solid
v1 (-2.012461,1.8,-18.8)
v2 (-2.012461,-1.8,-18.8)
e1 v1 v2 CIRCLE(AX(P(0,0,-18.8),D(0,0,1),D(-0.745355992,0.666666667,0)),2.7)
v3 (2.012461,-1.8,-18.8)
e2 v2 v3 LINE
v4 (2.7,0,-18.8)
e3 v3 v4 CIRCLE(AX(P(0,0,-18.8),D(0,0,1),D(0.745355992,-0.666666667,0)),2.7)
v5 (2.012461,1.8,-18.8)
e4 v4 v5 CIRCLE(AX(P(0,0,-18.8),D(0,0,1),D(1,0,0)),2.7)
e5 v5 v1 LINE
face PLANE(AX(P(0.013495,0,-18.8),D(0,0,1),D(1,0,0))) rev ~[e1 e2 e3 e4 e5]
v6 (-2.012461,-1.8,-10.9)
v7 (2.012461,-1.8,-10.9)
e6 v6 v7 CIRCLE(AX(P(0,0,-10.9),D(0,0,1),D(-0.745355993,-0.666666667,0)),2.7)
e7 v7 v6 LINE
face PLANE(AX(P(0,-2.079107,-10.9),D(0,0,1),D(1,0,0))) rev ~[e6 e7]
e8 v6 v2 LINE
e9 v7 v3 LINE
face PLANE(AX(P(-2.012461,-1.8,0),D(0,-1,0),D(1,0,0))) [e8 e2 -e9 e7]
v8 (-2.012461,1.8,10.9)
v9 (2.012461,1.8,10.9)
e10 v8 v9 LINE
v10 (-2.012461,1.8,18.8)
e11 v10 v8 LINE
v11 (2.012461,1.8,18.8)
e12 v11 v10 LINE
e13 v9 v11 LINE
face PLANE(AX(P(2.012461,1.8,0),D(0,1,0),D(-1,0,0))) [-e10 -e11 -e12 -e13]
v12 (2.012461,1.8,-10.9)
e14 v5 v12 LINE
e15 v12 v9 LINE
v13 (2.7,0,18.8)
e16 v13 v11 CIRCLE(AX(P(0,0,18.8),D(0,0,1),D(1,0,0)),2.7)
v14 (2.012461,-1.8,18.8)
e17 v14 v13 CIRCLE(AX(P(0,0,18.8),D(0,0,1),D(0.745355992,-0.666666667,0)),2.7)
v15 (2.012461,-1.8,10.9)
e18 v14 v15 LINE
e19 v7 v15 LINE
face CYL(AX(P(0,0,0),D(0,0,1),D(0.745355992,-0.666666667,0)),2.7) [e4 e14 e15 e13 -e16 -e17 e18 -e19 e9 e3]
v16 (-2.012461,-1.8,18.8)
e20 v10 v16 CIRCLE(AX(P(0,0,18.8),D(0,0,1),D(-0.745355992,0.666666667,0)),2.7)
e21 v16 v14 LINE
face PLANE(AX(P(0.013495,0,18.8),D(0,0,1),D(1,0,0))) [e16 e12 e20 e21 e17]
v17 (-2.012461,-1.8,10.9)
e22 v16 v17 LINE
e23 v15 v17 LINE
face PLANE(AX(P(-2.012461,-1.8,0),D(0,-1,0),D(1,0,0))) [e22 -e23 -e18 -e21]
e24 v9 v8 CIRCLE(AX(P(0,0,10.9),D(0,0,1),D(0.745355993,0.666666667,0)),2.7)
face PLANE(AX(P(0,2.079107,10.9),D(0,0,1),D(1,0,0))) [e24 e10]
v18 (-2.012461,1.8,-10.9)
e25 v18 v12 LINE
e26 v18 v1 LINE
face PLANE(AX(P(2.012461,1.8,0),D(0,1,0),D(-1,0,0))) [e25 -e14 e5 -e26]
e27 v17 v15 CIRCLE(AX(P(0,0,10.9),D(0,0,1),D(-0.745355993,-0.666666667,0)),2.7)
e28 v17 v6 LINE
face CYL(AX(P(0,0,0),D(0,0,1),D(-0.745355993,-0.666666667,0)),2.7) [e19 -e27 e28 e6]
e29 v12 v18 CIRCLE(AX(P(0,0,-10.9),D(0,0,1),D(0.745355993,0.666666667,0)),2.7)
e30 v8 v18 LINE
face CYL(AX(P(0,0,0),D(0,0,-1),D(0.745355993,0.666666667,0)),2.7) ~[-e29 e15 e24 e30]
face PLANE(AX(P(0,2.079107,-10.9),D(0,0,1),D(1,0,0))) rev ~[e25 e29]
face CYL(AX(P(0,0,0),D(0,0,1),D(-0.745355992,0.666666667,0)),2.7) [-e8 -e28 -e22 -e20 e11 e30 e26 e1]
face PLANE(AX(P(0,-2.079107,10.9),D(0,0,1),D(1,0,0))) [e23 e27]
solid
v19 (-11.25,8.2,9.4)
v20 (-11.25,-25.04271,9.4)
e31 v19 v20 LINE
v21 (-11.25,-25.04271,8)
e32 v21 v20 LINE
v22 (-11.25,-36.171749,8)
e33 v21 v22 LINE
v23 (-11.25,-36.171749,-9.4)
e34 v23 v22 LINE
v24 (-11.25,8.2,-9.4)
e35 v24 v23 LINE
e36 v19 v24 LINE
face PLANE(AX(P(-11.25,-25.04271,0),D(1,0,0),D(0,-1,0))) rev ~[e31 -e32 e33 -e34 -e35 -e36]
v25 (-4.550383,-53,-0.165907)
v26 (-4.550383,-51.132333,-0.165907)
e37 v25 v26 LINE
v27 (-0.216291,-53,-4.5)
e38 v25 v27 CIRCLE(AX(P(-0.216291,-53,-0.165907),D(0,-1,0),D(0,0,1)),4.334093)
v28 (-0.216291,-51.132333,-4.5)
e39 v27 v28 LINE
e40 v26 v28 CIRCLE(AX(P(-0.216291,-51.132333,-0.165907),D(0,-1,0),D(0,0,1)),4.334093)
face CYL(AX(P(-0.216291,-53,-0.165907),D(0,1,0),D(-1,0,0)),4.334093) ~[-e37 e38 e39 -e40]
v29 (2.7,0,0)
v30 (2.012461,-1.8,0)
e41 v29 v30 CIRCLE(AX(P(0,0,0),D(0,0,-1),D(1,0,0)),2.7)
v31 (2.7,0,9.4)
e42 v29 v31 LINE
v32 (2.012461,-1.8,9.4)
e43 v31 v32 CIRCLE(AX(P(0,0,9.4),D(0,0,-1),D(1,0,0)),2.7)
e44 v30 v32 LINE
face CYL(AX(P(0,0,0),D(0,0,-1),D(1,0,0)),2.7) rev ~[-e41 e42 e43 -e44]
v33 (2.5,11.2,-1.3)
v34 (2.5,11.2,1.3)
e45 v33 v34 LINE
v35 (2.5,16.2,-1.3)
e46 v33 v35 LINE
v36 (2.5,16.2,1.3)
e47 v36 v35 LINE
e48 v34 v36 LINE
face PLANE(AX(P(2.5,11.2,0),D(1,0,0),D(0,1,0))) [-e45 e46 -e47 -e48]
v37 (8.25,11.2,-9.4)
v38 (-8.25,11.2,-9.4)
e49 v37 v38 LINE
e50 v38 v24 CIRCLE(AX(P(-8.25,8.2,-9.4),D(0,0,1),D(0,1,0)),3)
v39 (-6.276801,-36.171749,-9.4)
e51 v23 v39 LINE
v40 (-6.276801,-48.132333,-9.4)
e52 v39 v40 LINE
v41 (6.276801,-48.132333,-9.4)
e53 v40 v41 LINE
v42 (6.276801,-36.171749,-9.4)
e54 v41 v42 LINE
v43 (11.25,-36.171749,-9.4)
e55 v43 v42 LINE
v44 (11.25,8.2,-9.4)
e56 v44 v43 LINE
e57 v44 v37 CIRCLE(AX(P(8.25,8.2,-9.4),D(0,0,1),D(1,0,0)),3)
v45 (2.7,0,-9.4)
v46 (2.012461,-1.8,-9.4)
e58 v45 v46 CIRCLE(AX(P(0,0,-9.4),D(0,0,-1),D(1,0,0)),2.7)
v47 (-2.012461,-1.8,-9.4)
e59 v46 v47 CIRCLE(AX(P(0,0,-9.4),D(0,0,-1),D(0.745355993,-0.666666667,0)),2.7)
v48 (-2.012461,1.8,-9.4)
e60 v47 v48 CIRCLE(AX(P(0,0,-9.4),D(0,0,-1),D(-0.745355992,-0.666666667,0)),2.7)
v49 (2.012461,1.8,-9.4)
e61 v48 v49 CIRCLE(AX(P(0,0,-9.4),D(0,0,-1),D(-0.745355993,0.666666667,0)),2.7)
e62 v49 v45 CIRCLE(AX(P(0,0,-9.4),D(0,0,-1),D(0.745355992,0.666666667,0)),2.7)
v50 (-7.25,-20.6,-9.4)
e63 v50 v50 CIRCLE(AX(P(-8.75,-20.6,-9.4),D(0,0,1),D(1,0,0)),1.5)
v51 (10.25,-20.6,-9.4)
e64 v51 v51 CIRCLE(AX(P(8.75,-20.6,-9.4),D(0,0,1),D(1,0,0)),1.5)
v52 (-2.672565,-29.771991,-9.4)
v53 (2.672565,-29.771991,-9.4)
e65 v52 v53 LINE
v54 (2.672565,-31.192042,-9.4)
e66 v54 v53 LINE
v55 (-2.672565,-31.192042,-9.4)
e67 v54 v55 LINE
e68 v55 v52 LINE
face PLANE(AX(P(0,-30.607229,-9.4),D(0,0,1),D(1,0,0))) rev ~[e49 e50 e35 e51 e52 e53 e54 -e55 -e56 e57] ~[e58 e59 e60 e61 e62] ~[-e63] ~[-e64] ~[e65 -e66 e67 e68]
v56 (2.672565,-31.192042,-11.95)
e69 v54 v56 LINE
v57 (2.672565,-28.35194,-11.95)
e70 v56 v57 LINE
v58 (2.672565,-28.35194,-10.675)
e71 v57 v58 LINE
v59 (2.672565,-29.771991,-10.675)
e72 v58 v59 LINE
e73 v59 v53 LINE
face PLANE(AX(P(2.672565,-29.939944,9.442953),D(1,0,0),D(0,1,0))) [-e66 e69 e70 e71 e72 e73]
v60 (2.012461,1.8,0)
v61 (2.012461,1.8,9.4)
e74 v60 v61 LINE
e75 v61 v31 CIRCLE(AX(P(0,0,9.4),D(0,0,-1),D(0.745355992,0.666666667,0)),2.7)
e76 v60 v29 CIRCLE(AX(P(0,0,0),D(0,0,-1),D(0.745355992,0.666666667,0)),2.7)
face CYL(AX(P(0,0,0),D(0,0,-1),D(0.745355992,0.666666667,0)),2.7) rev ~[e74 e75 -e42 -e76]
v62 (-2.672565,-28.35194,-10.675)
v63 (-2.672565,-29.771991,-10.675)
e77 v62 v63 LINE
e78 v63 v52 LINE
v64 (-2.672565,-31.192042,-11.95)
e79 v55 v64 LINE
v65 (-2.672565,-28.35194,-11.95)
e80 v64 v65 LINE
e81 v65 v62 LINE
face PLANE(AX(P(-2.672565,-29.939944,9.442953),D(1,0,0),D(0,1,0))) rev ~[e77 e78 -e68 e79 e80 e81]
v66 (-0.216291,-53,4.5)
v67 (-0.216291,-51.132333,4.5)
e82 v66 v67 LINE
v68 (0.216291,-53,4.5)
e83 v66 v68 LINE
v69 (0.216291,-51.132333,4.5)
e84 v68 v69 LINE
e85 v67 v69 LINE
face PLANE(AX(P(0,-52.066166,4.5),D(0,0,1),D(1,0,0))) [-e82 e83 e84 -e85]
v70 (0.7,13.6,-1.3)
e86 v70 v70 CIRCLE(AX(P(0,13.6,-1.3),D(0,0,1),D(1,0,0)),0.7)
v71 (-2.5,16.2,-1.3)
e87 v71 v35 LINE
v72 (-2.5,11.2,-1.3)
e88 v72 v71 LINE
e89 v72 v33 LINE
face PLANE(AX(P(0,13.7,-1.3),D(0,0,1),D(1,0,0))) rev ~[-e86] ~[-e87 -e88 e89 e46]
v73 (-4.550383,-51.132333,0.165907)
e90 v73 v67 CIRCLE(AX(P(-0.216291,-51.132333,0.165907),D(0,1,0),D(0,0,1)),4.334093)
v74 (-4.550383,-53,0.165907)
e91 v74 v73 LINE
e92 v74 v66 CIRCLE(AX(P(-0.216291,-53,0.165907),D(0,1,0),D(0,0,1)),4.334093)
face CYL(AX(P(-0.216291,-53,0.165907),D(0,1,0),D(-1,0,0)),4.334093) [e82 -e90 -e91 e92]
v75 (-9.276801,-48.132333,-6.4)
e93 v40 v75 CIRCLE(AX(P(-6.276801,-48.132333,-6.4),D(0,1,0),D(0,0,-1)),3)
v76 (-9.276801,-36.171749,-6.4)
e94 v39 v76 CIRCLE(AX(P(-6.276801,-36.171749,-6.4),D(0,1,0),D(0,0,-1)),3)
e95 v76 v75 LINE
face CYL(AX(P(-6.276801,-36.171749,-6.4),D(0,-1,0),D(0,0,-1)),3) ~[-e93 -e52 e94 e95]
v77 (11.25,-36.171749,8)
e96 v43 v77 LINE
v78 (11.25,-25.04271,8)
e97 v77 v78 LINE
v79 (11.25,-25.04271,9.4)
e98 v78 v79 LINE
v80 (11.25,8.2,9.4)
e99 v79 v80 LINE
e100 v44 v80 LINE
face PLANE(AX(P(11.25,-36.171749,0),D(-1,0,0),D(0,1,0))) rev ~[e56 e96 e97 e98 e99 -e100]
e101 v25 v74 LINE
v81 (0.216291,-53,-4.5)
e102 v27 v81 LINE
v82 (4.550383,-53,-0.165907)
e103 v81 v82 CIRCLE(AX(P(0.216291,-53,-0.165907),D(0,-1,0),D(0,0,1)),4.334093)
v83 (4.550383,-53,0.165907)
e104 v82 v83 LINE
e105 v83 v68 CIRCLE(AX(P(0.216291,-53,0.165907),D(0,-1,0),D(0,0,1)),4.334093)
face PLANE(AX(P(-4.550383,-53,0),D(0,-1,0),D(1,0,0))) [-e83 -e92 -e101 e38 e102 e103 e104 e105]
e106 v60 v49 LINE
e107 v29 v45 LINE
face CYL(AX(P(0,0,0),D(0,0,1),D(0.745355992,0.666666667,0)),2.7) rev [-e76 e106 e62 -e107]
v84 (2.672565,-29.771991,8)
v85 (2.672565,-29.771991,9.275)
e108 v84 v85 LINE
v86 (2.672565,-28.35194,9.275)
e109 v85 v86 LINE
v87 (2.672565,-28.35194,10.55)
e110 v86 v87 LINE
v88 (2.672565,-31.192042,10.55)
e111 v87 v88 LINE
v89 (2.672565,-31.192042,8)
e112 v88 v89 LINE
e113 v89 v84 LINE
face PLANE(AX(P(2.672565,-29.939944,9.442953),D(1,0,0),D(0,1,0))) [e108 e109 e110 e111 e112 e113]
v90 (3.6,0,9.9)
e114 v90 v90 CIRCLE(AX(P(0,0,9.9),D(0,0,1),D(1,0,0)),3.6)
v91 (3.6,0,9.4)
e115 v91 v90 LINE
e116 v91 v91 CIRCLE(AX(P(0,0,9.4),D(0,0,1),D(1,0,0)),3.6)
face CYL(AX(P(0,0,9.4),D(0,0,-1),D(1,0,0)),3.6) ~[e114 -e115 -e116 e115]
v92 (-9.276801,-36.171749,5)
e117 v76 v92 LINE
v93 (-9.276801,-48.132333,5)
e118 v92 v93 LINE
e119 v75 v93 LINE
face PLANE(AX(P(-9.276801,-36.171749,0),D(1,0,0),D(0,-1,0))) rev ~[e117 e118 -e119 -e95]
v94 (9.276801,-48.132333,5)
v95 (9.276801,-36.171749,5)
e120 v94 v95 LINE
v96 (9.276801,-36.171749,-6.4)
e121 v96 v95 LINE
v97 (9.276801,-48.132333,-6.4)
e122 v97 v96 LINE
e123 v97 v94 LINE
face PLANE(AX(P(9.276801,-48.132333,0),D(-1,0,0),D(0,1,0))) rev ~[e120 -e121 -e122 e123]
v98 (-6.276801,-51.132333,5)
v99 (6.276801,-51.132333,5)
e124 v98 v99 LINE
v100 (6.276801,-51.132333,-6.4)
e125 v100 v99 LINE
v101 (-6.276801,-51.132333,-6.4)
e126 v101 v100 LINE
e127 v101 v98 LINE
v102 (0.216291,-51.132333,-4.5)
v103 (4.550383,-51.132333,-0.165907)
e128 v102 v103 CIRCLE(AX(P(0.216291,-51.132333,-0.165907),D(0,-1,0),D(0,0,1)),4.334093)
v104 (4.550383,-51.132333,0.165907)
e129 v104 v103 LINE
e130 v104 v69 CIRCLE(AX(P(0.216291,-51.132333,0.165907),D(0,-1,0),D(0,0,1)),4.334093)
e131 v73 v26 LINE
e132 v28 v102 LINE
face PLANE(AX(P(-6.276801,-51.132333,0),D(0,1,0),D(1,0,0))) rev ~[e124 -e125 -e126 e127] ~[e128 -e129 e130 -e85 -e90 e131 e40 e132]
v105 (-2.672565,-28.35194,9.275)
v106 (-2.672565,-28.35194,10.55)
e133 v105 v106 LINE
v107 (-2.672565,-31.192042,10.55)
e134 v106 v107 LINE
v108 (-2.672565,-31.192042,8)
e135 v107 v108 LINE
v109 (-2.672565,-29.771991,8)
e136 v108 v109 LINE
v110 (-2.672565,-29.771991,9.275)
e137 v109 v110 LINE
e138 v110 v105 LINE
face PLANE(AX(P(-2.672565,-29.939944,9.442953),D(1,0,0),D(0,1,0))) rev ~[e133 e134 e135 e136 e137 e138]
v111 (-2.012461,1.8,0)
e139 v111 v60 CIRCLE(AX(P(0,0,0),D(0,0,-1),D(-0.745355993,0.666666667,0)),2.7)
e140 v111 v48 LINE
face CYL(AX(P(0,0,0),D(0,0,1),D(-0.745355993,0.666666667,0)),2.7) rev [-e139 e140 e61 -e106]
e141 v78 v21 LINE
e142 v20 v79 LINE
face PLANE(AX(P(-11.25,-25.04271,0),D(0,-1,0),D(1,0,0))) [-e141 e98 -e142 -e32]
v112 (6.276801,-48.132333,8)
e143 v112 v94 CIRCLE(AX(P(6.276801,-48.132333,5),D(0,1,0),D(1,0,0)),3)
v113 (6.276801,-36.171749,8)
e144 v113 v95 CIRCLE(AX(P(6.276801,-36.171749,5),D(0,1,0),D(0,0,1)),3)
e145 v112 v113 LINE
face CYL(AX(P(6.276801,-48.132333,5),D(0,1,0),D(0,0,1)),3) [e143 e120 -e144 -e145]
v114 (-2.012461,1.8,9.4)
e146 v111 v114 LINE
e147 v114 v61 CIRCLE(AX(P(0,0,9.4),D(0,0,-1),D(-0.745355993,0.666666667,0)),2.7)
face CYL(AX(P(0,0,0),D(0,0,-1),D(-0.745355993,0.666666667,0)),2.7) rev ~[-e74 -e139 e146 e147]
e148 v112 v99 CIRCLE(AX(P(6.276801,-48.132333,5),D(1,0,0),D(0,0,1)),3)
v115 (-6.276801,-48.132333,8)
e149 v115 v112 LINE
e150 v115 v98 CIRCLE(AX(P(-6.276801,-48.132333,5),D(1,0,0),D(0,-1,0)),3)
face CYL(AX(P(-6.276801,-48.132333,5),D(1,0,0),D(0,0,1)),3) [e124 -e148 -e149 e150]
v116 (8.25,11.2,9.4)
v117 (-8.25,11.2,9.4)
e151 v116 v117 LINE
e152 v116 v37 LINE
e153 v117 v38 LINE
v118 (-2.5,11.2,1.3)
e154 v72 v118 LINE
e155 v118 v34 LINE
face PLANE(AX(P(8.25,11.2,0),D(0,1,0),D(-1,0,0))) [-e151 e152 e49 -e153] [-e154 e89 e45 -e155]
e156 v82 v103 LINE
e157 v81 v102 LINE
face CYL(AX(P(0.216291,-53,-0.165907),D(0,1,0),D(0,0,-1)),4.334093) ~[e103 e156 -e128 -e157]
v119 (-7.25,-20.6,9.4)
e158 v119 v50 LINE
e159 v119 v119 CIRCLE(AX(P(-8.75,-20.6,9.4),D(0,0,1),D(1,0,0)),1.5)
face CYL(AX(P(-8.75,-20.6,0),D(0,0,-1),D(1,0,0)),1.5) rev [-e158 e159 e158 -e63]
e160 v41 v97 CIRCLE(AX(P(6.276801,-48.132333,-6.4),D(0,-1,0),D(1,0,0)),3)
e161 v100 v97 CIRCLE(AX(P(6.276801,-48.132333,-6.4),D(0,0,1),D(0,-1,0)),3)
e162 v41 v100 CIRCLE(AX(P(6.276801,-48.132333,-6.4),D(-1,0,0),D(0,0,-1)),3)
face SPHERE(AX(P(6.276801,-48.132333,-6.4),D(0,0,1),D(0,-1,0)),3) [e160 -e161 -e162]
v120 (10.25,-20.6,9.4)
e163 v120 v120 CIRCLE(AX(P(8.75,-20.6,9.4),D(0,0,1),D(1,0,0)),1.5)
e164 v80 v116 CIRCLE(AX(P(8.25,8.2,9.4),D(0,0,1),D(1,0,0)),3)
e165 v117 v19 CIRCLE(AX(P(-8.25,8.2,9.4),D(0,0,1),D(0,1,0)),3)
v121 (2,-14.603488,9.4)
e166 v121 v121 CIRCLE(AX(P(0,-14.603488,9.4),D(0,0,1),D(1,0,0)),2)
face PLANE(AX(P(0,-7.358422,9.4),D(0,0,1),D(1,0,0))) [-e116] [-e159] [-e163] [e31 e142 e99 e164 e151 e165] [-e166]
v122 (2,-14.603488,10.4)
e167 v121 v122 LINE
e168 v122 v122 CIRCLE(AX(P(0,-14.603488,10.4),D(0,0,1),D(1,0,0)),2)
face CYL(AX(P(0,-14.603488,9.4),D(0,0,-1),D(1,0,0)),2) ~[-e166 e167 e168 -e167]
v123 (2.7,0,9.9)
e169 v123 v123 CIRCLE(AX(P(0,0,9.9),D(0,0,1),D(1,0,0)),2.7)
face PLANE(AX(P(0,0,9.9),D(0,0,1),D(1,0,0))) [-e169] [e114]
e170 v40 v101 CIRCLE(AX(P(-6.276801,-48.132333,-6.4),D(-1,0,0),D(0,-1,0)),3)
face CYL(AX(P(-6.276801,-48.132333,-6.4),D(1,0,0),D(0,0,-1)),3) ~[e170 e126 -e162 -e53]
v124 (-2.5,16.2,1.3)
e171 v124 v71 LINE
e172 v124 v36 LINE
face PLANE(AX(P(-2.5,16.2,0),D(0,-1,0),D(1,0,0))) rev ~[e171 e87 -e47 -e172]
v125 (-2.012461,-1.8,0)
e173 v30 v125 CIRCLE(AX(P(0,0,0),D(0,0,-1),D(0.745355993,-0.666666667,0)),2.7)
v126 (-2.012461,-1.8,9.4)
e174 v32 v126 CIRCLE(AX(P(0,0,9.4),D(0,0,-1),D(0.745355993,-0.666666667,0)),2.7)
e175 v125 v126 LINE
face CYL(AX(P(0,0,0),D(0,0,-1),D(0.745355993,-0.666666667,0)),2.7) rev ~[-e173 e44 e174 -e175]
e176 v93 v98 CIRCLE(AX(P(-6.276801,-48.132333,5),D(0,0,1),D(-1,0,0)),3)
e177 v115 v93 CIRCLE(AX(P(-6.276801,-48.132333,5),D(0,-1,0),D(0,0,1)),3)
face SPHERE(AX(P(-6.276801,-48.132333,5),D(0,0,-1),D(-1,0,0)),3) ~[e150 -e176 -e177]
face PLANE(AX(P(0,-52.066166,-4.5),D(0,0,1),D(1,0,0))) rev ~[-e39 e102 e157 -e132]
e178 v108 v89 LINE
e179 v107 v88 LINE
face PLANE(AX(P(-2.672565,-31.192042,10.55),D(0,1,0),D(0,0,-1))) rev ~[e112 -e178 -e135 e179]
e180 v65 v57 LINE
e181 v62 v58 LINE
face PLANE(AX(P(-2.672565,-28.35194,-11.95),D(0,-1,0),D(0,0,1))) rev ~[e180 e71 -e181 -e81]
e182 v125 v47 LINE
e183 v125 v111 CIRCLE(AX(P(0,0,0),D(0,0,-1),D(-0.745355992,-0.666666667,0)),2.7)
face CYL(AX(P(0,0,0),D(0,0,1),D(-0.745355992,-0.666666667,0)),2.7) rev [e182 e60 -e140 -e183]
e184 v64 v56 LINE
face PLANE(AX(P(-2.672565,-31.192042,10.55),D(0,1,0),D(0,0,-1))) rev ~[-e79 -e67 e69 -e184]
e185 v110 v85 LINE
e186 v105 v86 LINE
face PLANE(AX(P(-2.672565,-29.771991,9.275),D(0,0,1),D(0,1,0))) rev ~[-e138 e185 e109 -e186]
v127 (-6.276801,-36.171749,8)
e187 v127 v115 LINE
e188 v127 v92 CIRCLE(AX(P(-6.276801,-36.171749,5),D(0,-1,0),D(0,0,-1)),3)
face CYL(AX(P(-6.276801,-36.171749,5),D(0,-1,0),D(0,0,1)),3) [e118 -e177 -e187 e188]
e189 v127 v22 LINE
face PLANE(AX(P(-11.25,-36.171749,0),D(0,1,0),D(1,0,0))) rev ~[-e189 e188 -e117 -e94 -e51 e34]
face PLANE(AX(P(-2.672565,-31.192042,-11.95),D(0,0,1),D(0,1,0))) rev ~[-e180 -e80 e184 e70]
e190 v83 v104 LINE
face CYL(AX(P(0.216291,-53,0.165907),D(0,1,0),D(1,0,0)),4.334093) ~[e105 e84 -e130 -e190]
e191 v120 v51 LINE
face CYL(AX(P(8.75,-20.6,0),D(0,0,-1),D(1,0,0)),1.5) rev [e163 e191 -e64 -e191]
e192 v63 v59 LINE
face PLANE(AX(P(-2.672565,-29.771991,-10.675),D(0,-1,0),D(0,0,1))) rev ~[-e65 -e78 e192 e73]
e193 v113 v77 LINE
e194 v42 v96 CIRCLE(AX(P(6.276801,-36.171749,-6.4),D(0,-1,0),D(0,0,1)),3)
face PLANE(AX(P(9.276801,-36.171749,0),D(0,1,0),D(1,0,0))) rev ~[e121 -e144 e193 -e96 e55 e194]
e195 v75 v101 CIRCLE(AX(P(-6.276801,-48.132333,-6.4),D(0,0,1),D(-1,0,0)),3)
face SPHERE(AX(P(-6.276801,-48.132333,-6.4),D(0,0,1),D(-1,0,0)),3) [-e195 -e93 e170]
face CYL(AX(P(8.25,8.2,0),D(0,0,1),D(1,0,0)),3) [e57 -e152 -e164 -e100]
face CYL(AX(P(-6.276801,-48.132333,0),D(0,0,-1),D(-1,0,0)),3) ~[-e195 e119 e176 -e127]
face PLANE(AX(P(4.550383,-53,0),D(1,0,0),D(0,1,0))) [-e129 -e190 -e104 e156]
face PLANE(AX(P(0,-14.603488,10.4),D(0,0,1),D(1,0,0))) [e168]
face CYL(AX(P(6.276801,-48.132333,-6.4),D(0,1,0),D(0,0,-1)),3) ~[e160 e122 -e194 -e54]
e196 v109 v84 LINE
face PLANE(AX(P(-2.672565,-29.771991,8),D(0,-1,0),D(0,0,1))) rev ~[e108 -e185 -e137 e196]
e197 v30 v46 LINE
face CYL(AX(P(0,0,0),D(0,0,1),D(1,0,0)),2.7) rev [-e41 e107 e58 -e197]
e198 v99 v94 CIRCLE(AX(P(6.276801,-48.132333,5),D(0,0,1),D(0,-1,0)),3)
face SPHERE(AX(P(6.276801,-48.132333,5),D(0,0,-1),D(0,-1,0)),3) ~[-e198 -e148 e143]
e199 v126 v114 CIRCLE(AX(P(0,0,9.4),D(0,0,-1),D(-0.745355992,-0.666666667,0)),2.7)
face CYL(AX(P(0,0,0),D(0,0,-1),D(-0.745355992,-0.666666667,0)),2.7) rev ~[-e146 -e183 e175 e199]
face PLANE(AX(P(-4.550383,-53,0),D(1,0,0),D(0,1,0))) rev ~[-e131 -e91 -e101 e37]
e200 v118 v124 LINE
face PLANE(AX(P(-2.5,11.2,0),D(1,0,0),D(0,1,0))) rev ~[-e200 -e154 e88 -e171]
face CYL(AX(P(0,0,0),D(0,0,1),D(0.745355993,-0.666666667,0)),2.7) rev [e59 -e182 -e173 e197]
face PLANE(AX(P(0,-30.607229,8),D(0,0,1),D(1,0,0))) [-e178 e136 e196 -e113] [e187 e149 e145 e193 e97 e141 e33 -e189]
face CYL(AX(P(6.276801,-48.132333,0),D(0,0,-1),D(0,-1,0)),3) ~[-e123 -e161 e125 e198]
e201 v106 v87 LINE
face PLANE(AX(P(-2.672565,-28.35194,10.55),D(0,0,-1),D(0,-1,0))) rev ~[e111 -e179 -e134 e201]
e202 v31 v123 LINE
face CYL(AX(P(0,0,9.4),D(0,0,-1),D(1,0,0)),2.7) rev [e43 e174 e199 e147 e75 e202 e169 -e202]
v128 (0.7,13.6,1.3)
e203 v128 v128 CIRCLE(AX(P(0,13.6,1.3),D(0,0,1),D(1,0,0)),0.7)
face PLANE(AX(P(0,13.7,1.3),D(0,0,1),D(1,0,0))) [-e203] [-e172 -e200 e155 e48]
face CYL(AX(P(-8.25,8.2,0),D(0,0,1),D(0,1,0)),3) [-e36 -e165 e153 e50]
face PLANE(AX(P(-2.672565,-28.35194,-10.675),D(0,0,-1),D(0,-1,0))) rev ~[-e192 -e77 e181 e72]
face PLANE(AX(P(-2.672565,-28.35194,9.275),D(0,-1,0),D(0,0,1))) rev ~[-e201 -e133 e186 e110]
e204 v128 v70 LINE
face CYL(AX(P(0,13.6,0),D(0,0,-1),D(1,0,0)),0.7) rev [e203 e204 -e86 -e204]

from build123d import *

# Parameters (mm, degrees)
F0_R      = 1.5
F0_R_2    = 3.6
F1_DEPTH  = 9.4
F0_W      = 5
F0_H      = 5
F0_R_3    = 0.7
F2_DEPTH  = 1.3
F0_W_2    = 5.3451308049
F0_H_2    = 2.8401017189
F3_DEPTH  = 9.4
F4_DEPTH  = 8
F0_W_3    = 9.1007668525
F0_H_3    = 1.8676674664
F5_DEPTH  = 4.5
F6_R      = 3
F7_R      = 4.3340927557
F9_DEPTH  = 5.3451308049
F10_R     = 2
F11_DEPTH = 1
F10_R_2   = 3.6
F10_R_3   = 2.7
F12_DEPTH = 0.5
F13_DEPTH = 18.8
F14_DEPTH = 10.9


with BuildPart() as f1:
    # F0 (on Top) → F1 (new body, symmetric)
    with BuildSketch(Plane.XY):
        with BuildLine():
            Line((-11.25, 8.2), (-11.25, -25.0427096879))
            Line((-11.25, -25.0427096879), (11.25, -25.0427096879))
            Line((11.25, -25.0427096879), (11.25, 8.2))
            ThreePointArc((11.25, 8.2), (10.3713203436, 10.3213203436), (8.25, 11.2))
            Line((8.25, 11.2), (2.5, 11.2))
            Line((2.5, 11.2), (-2.5, 11.2))
            Line((-2.5, 11.2), (-8.25, 11.2))
            ThreePointArc((-8.25, 11.2), (-10.3713203436, 10.3213203436), (-11.25, 8.2))
        make_face()
        with Locations((-8.75, -20.6)):
            Circle(F0_R, mode=Mode.SUBTRACT)
        with Locations((8.75, -20.6)):
            Circle(F0_R, mode=Mode.SUBTRACT)
        Circle(F0_R_2, mode=Mode.SUBTRACT)
        Circle(F0_R_2)
        with BuildLine():
            ThreePointArc((2.0124611797, 1.8), (2.5222653692, 0.9634196424), (2.7, 0))
            ThreePointArc((2.7, 0), (2.5222653692, -0.9634196424), (2.0124611797, -1.8))
            ThreePointArc((2.0124611797, -1.8), (0, -2.7), (-2.0124611797, -1.8))
            ThreePointArc((-2.0124611797, -1.8), (-2.7, 0), (-2.0124611797, 1.8))
            ThreePointArc((-2.0124611797, 1.8), (0, 2.7), (2.0124611797, 1.8))
        make_face(mode=Mode.SUBTRACT)
    extrude(amount=F1_DEPTH, both=True)

    # F0 (on Top) → F2 (join, symmetric)
    with BuildSketch(Plane.XY):
        with Locations((0, 13.7)):
            Rectangle(F0_W, F0_H)
        with Locations((0, 13.6)):
            Circle(F0_R_3, mode=Mode.SUBTRACT)
    extrude(amount=F2_DEPTH, both=True)

    # F0 (on Top) → F3 (join)
    with BuildSketch(Plane.XY):
        Polygon((11.25, -25.0427096879), (-11.25, -25.0427096879), (-11.25, -36.1717492342), (-9.2768007889, -36.1717492342), (9.2768007889, -36.1717492342), (11.25, -36.1717492342), align=None)
        with Locations((0, -29.7719910741)):
            Rectangle(F0_W_2, F0_H_2, mode=Mode.SUBTRACT)
        with BuildLine():
            Line((9.2768007889, -36.1717492342), (-9.2768007889, -36.1717492342))
            Line((-9.2768007889, -36.1717492342), (-9.2768007889, -48.1323325336))
            ThreePointArc((-9.2768007889, -48.1323325336), (-8.3981211325, -50.2536528772), (-6.2768007889, -51.1323325336))
            Line((-6.2768007889, -51.1323325336), (-4.5503834262, -51.1323325336))
            Line((-4.5503834262, -51.1323325336), (4.5503834262, -51.1323325336))
            Line((4.5503834262, -51.1323325336), (6.2768007889, -51.1323325336))
            ThreePointArc((6.2768007889, -51.1323325336), (8.3981211325, -50.2536528772), (9.2768007889, -48.1323325336))
            Line((9.2768007889, -48.1323325336), (9.2768007889, -36.1717492342))
        make_face()
        with Locations((0, -29.7719910741)):
            Rectangle(F0_W_2, F0_H_2)
    extrude(amount=-F3_DEPTH)

    # F0 (on Top) → F4 (join)
    with BuildSketch(Plane.XY):
        Polygon((11.25, -25.0427096879), (-11.25, -25.0427096879), (-11.25, -36.1717492342), (-9.2768007889, -36.1717492342), (9.2768007889, -36.1717492342), (11.25, -36.1717492342), align=None)
        with Locations((0, -29.7719910741)):
            Rectangle(F0_W_2, F0_H_2, mode=Mode.SUBTRACT)
        with BuildLine():
            Line((9.2768007889, -36.1717492342), (-9.2768007889, -36.1717492342))
            Line((-9.2768007889, -36.1717492342), (-9.2768007889, -48.1323325336))
            ThreePointArc((-9.2768007889, -48.1323325336), (-8.3981211325, -50.2536528772), (-6.2768007889, -51.1323325336))
            Line((-6.2768007889, -51.1323325336), (-4.5503834262, -51.1323325336))
            Line((-4.5503834262, -51.1323325336), (4.5503834262, -51.1323325336))
            Line((4.5503834262, -51.1323325336), (6.2768007889, -51.1323325336))
            ThreePointArc((6.2768007889, -51.1323325336), (8.3981211325, -50.2536528772), (9.2768007889, -48.1323325336))
            Line((9.2768007889, -48.1323325336), (9.2768007889, -36.1717492342))
        make_face()
    extrude(amount=F4_DEPTH)

    # F0 (on Top) → F5 (join, symmetric)
    with BuildSketch(Plane.XY):
        with Locations((0, -52.0661662668)):
            Rectangle(F0_W_3, F0_H_3)
    extrude(amount=F5_DEPTH, both=True)

    # F6
    f6_edges = [f1.edges().sort_by_distance(p)[0] for p in [
        (0, -51.132333, -9.4),
        (0, -51.132333, 8),
        (-9.276801, -42.152041, -9.4),
        (-8.398121, -50.253653, -9.4),
        (8.398121, -50.253653, -9.4),
        (9.276801, -42.152041, -9.4),
        (-9.276801, -42.152041, 8),
        (-8.398121, -50.253653, 8),
        (8.398121, -50.253653, 8),
        (9.276801, -42.152041, 8),
    ]]
    fillet(f6_edges, radius=F6_R)

    # F7
    f7_edges = [f1.edges().sort_by_distance(p)[0] for p in [
        (4.550383, -52.066166, -4.5),
        (4.550383, -52.066166, 4.5),
        (-4.550383, -52.066166, -4.5),
        (-4.550383, -52.066166, 4.5),
    ]]
    fillet(f7_edges, radius=F7_R)

    # F8 (on face) → F9 (join, through all)
    with BuildSketch(Plane.YZ.offset(-2.6725654025)):
        Polygon((-31.1920419335, 10.55), (-31.1920419335, 8), (-29.7719910741, 8), (-29.7719910741, 9.275), (-28.3519402146, 9.275), (-28.3519402146, 10.55), align=None)
        Polygon((-29.7719910741, 8), (-31.1920419335, 8), (-31.1920419335, 0), (-28.3519402146, 0), (-28.3519402146, 8), align=None)
        Polygon((-28.3519402146, 0), (-31.1920419335, 0), (-31.1920419335, -9.4), (-31.1920419335, -11.95), (-28.3519402146, -11.95), (-28.3519402146, -10.675), (-29.7719910741, -10.675), (-29.7719910741, -9.4), (-28.3519402146, -9.4), align=None)
    extrude(amount=F9_DEPTH)

    # F10 (on face) → F11 (join)
    with BuildSketch(Plane.XY.offset(9.4)):
        with Locations((0, -14.6034881473)):
            Circle(F10_R)
    extrude(amount=F11_DEPTH)

    # F10 (on face) → F12 (join)
    with BuildSketch(Plane.XY.offset(9.4)):
        Circle(F10_R_2)
        Circle(F10_R_3, mode=Mode.SUBTRACT)
    extrude(amount=F12_DEPTH)


with BuildPart() as f13:
    # F0 (on Top) → F13 (new body, symmetric)
    with BuildSketch(Plane.XY):
        with BuildLine():
            ThreePointArc((2.0124611797, -1.8), (2.5222653692, -0.9634196424), (2.7, 0))
            ThreePointArc((2.7, 0), (2.5222653692, 0.9634196424), (2.0124611797, 1.8))
            Line((2.0124611797, 1.8), (-2.0124611797, 1.8))
            ThreePointArc((-2.0124611797, 1.8), (-2.7, 0), (-2.0124611797, -1.8))
            Line((-2.0124611797, -1.8), (2.0124611797, -1.8))
        make_face()
    extrude(amount=F13_DEPTH, both=True)

    # F0 (on Top) → F14 (join, symmetric)
    with BuildSketch(Plane.XY):
        with BuildLine():
            Line((-2.0124611797, 1.8), (2.0124611797, 1.8))
            ThreePointArc((2.0124611797, 1.8), (0, 2.7), (-2.0124611797, 1.8))
        make_face()
        with BuildLine():
            ThreePointArc((-2.0124611797, -1.8), (0, -2.7), (2.0124611797, -1.8))
            Line((2.0124611797, -1.8), (-2.0124611797, -1.8))
        make_face()
    extrude(amount=F14_DEPTH, both=True)


solid = Compound([f1.part, f13.part])
